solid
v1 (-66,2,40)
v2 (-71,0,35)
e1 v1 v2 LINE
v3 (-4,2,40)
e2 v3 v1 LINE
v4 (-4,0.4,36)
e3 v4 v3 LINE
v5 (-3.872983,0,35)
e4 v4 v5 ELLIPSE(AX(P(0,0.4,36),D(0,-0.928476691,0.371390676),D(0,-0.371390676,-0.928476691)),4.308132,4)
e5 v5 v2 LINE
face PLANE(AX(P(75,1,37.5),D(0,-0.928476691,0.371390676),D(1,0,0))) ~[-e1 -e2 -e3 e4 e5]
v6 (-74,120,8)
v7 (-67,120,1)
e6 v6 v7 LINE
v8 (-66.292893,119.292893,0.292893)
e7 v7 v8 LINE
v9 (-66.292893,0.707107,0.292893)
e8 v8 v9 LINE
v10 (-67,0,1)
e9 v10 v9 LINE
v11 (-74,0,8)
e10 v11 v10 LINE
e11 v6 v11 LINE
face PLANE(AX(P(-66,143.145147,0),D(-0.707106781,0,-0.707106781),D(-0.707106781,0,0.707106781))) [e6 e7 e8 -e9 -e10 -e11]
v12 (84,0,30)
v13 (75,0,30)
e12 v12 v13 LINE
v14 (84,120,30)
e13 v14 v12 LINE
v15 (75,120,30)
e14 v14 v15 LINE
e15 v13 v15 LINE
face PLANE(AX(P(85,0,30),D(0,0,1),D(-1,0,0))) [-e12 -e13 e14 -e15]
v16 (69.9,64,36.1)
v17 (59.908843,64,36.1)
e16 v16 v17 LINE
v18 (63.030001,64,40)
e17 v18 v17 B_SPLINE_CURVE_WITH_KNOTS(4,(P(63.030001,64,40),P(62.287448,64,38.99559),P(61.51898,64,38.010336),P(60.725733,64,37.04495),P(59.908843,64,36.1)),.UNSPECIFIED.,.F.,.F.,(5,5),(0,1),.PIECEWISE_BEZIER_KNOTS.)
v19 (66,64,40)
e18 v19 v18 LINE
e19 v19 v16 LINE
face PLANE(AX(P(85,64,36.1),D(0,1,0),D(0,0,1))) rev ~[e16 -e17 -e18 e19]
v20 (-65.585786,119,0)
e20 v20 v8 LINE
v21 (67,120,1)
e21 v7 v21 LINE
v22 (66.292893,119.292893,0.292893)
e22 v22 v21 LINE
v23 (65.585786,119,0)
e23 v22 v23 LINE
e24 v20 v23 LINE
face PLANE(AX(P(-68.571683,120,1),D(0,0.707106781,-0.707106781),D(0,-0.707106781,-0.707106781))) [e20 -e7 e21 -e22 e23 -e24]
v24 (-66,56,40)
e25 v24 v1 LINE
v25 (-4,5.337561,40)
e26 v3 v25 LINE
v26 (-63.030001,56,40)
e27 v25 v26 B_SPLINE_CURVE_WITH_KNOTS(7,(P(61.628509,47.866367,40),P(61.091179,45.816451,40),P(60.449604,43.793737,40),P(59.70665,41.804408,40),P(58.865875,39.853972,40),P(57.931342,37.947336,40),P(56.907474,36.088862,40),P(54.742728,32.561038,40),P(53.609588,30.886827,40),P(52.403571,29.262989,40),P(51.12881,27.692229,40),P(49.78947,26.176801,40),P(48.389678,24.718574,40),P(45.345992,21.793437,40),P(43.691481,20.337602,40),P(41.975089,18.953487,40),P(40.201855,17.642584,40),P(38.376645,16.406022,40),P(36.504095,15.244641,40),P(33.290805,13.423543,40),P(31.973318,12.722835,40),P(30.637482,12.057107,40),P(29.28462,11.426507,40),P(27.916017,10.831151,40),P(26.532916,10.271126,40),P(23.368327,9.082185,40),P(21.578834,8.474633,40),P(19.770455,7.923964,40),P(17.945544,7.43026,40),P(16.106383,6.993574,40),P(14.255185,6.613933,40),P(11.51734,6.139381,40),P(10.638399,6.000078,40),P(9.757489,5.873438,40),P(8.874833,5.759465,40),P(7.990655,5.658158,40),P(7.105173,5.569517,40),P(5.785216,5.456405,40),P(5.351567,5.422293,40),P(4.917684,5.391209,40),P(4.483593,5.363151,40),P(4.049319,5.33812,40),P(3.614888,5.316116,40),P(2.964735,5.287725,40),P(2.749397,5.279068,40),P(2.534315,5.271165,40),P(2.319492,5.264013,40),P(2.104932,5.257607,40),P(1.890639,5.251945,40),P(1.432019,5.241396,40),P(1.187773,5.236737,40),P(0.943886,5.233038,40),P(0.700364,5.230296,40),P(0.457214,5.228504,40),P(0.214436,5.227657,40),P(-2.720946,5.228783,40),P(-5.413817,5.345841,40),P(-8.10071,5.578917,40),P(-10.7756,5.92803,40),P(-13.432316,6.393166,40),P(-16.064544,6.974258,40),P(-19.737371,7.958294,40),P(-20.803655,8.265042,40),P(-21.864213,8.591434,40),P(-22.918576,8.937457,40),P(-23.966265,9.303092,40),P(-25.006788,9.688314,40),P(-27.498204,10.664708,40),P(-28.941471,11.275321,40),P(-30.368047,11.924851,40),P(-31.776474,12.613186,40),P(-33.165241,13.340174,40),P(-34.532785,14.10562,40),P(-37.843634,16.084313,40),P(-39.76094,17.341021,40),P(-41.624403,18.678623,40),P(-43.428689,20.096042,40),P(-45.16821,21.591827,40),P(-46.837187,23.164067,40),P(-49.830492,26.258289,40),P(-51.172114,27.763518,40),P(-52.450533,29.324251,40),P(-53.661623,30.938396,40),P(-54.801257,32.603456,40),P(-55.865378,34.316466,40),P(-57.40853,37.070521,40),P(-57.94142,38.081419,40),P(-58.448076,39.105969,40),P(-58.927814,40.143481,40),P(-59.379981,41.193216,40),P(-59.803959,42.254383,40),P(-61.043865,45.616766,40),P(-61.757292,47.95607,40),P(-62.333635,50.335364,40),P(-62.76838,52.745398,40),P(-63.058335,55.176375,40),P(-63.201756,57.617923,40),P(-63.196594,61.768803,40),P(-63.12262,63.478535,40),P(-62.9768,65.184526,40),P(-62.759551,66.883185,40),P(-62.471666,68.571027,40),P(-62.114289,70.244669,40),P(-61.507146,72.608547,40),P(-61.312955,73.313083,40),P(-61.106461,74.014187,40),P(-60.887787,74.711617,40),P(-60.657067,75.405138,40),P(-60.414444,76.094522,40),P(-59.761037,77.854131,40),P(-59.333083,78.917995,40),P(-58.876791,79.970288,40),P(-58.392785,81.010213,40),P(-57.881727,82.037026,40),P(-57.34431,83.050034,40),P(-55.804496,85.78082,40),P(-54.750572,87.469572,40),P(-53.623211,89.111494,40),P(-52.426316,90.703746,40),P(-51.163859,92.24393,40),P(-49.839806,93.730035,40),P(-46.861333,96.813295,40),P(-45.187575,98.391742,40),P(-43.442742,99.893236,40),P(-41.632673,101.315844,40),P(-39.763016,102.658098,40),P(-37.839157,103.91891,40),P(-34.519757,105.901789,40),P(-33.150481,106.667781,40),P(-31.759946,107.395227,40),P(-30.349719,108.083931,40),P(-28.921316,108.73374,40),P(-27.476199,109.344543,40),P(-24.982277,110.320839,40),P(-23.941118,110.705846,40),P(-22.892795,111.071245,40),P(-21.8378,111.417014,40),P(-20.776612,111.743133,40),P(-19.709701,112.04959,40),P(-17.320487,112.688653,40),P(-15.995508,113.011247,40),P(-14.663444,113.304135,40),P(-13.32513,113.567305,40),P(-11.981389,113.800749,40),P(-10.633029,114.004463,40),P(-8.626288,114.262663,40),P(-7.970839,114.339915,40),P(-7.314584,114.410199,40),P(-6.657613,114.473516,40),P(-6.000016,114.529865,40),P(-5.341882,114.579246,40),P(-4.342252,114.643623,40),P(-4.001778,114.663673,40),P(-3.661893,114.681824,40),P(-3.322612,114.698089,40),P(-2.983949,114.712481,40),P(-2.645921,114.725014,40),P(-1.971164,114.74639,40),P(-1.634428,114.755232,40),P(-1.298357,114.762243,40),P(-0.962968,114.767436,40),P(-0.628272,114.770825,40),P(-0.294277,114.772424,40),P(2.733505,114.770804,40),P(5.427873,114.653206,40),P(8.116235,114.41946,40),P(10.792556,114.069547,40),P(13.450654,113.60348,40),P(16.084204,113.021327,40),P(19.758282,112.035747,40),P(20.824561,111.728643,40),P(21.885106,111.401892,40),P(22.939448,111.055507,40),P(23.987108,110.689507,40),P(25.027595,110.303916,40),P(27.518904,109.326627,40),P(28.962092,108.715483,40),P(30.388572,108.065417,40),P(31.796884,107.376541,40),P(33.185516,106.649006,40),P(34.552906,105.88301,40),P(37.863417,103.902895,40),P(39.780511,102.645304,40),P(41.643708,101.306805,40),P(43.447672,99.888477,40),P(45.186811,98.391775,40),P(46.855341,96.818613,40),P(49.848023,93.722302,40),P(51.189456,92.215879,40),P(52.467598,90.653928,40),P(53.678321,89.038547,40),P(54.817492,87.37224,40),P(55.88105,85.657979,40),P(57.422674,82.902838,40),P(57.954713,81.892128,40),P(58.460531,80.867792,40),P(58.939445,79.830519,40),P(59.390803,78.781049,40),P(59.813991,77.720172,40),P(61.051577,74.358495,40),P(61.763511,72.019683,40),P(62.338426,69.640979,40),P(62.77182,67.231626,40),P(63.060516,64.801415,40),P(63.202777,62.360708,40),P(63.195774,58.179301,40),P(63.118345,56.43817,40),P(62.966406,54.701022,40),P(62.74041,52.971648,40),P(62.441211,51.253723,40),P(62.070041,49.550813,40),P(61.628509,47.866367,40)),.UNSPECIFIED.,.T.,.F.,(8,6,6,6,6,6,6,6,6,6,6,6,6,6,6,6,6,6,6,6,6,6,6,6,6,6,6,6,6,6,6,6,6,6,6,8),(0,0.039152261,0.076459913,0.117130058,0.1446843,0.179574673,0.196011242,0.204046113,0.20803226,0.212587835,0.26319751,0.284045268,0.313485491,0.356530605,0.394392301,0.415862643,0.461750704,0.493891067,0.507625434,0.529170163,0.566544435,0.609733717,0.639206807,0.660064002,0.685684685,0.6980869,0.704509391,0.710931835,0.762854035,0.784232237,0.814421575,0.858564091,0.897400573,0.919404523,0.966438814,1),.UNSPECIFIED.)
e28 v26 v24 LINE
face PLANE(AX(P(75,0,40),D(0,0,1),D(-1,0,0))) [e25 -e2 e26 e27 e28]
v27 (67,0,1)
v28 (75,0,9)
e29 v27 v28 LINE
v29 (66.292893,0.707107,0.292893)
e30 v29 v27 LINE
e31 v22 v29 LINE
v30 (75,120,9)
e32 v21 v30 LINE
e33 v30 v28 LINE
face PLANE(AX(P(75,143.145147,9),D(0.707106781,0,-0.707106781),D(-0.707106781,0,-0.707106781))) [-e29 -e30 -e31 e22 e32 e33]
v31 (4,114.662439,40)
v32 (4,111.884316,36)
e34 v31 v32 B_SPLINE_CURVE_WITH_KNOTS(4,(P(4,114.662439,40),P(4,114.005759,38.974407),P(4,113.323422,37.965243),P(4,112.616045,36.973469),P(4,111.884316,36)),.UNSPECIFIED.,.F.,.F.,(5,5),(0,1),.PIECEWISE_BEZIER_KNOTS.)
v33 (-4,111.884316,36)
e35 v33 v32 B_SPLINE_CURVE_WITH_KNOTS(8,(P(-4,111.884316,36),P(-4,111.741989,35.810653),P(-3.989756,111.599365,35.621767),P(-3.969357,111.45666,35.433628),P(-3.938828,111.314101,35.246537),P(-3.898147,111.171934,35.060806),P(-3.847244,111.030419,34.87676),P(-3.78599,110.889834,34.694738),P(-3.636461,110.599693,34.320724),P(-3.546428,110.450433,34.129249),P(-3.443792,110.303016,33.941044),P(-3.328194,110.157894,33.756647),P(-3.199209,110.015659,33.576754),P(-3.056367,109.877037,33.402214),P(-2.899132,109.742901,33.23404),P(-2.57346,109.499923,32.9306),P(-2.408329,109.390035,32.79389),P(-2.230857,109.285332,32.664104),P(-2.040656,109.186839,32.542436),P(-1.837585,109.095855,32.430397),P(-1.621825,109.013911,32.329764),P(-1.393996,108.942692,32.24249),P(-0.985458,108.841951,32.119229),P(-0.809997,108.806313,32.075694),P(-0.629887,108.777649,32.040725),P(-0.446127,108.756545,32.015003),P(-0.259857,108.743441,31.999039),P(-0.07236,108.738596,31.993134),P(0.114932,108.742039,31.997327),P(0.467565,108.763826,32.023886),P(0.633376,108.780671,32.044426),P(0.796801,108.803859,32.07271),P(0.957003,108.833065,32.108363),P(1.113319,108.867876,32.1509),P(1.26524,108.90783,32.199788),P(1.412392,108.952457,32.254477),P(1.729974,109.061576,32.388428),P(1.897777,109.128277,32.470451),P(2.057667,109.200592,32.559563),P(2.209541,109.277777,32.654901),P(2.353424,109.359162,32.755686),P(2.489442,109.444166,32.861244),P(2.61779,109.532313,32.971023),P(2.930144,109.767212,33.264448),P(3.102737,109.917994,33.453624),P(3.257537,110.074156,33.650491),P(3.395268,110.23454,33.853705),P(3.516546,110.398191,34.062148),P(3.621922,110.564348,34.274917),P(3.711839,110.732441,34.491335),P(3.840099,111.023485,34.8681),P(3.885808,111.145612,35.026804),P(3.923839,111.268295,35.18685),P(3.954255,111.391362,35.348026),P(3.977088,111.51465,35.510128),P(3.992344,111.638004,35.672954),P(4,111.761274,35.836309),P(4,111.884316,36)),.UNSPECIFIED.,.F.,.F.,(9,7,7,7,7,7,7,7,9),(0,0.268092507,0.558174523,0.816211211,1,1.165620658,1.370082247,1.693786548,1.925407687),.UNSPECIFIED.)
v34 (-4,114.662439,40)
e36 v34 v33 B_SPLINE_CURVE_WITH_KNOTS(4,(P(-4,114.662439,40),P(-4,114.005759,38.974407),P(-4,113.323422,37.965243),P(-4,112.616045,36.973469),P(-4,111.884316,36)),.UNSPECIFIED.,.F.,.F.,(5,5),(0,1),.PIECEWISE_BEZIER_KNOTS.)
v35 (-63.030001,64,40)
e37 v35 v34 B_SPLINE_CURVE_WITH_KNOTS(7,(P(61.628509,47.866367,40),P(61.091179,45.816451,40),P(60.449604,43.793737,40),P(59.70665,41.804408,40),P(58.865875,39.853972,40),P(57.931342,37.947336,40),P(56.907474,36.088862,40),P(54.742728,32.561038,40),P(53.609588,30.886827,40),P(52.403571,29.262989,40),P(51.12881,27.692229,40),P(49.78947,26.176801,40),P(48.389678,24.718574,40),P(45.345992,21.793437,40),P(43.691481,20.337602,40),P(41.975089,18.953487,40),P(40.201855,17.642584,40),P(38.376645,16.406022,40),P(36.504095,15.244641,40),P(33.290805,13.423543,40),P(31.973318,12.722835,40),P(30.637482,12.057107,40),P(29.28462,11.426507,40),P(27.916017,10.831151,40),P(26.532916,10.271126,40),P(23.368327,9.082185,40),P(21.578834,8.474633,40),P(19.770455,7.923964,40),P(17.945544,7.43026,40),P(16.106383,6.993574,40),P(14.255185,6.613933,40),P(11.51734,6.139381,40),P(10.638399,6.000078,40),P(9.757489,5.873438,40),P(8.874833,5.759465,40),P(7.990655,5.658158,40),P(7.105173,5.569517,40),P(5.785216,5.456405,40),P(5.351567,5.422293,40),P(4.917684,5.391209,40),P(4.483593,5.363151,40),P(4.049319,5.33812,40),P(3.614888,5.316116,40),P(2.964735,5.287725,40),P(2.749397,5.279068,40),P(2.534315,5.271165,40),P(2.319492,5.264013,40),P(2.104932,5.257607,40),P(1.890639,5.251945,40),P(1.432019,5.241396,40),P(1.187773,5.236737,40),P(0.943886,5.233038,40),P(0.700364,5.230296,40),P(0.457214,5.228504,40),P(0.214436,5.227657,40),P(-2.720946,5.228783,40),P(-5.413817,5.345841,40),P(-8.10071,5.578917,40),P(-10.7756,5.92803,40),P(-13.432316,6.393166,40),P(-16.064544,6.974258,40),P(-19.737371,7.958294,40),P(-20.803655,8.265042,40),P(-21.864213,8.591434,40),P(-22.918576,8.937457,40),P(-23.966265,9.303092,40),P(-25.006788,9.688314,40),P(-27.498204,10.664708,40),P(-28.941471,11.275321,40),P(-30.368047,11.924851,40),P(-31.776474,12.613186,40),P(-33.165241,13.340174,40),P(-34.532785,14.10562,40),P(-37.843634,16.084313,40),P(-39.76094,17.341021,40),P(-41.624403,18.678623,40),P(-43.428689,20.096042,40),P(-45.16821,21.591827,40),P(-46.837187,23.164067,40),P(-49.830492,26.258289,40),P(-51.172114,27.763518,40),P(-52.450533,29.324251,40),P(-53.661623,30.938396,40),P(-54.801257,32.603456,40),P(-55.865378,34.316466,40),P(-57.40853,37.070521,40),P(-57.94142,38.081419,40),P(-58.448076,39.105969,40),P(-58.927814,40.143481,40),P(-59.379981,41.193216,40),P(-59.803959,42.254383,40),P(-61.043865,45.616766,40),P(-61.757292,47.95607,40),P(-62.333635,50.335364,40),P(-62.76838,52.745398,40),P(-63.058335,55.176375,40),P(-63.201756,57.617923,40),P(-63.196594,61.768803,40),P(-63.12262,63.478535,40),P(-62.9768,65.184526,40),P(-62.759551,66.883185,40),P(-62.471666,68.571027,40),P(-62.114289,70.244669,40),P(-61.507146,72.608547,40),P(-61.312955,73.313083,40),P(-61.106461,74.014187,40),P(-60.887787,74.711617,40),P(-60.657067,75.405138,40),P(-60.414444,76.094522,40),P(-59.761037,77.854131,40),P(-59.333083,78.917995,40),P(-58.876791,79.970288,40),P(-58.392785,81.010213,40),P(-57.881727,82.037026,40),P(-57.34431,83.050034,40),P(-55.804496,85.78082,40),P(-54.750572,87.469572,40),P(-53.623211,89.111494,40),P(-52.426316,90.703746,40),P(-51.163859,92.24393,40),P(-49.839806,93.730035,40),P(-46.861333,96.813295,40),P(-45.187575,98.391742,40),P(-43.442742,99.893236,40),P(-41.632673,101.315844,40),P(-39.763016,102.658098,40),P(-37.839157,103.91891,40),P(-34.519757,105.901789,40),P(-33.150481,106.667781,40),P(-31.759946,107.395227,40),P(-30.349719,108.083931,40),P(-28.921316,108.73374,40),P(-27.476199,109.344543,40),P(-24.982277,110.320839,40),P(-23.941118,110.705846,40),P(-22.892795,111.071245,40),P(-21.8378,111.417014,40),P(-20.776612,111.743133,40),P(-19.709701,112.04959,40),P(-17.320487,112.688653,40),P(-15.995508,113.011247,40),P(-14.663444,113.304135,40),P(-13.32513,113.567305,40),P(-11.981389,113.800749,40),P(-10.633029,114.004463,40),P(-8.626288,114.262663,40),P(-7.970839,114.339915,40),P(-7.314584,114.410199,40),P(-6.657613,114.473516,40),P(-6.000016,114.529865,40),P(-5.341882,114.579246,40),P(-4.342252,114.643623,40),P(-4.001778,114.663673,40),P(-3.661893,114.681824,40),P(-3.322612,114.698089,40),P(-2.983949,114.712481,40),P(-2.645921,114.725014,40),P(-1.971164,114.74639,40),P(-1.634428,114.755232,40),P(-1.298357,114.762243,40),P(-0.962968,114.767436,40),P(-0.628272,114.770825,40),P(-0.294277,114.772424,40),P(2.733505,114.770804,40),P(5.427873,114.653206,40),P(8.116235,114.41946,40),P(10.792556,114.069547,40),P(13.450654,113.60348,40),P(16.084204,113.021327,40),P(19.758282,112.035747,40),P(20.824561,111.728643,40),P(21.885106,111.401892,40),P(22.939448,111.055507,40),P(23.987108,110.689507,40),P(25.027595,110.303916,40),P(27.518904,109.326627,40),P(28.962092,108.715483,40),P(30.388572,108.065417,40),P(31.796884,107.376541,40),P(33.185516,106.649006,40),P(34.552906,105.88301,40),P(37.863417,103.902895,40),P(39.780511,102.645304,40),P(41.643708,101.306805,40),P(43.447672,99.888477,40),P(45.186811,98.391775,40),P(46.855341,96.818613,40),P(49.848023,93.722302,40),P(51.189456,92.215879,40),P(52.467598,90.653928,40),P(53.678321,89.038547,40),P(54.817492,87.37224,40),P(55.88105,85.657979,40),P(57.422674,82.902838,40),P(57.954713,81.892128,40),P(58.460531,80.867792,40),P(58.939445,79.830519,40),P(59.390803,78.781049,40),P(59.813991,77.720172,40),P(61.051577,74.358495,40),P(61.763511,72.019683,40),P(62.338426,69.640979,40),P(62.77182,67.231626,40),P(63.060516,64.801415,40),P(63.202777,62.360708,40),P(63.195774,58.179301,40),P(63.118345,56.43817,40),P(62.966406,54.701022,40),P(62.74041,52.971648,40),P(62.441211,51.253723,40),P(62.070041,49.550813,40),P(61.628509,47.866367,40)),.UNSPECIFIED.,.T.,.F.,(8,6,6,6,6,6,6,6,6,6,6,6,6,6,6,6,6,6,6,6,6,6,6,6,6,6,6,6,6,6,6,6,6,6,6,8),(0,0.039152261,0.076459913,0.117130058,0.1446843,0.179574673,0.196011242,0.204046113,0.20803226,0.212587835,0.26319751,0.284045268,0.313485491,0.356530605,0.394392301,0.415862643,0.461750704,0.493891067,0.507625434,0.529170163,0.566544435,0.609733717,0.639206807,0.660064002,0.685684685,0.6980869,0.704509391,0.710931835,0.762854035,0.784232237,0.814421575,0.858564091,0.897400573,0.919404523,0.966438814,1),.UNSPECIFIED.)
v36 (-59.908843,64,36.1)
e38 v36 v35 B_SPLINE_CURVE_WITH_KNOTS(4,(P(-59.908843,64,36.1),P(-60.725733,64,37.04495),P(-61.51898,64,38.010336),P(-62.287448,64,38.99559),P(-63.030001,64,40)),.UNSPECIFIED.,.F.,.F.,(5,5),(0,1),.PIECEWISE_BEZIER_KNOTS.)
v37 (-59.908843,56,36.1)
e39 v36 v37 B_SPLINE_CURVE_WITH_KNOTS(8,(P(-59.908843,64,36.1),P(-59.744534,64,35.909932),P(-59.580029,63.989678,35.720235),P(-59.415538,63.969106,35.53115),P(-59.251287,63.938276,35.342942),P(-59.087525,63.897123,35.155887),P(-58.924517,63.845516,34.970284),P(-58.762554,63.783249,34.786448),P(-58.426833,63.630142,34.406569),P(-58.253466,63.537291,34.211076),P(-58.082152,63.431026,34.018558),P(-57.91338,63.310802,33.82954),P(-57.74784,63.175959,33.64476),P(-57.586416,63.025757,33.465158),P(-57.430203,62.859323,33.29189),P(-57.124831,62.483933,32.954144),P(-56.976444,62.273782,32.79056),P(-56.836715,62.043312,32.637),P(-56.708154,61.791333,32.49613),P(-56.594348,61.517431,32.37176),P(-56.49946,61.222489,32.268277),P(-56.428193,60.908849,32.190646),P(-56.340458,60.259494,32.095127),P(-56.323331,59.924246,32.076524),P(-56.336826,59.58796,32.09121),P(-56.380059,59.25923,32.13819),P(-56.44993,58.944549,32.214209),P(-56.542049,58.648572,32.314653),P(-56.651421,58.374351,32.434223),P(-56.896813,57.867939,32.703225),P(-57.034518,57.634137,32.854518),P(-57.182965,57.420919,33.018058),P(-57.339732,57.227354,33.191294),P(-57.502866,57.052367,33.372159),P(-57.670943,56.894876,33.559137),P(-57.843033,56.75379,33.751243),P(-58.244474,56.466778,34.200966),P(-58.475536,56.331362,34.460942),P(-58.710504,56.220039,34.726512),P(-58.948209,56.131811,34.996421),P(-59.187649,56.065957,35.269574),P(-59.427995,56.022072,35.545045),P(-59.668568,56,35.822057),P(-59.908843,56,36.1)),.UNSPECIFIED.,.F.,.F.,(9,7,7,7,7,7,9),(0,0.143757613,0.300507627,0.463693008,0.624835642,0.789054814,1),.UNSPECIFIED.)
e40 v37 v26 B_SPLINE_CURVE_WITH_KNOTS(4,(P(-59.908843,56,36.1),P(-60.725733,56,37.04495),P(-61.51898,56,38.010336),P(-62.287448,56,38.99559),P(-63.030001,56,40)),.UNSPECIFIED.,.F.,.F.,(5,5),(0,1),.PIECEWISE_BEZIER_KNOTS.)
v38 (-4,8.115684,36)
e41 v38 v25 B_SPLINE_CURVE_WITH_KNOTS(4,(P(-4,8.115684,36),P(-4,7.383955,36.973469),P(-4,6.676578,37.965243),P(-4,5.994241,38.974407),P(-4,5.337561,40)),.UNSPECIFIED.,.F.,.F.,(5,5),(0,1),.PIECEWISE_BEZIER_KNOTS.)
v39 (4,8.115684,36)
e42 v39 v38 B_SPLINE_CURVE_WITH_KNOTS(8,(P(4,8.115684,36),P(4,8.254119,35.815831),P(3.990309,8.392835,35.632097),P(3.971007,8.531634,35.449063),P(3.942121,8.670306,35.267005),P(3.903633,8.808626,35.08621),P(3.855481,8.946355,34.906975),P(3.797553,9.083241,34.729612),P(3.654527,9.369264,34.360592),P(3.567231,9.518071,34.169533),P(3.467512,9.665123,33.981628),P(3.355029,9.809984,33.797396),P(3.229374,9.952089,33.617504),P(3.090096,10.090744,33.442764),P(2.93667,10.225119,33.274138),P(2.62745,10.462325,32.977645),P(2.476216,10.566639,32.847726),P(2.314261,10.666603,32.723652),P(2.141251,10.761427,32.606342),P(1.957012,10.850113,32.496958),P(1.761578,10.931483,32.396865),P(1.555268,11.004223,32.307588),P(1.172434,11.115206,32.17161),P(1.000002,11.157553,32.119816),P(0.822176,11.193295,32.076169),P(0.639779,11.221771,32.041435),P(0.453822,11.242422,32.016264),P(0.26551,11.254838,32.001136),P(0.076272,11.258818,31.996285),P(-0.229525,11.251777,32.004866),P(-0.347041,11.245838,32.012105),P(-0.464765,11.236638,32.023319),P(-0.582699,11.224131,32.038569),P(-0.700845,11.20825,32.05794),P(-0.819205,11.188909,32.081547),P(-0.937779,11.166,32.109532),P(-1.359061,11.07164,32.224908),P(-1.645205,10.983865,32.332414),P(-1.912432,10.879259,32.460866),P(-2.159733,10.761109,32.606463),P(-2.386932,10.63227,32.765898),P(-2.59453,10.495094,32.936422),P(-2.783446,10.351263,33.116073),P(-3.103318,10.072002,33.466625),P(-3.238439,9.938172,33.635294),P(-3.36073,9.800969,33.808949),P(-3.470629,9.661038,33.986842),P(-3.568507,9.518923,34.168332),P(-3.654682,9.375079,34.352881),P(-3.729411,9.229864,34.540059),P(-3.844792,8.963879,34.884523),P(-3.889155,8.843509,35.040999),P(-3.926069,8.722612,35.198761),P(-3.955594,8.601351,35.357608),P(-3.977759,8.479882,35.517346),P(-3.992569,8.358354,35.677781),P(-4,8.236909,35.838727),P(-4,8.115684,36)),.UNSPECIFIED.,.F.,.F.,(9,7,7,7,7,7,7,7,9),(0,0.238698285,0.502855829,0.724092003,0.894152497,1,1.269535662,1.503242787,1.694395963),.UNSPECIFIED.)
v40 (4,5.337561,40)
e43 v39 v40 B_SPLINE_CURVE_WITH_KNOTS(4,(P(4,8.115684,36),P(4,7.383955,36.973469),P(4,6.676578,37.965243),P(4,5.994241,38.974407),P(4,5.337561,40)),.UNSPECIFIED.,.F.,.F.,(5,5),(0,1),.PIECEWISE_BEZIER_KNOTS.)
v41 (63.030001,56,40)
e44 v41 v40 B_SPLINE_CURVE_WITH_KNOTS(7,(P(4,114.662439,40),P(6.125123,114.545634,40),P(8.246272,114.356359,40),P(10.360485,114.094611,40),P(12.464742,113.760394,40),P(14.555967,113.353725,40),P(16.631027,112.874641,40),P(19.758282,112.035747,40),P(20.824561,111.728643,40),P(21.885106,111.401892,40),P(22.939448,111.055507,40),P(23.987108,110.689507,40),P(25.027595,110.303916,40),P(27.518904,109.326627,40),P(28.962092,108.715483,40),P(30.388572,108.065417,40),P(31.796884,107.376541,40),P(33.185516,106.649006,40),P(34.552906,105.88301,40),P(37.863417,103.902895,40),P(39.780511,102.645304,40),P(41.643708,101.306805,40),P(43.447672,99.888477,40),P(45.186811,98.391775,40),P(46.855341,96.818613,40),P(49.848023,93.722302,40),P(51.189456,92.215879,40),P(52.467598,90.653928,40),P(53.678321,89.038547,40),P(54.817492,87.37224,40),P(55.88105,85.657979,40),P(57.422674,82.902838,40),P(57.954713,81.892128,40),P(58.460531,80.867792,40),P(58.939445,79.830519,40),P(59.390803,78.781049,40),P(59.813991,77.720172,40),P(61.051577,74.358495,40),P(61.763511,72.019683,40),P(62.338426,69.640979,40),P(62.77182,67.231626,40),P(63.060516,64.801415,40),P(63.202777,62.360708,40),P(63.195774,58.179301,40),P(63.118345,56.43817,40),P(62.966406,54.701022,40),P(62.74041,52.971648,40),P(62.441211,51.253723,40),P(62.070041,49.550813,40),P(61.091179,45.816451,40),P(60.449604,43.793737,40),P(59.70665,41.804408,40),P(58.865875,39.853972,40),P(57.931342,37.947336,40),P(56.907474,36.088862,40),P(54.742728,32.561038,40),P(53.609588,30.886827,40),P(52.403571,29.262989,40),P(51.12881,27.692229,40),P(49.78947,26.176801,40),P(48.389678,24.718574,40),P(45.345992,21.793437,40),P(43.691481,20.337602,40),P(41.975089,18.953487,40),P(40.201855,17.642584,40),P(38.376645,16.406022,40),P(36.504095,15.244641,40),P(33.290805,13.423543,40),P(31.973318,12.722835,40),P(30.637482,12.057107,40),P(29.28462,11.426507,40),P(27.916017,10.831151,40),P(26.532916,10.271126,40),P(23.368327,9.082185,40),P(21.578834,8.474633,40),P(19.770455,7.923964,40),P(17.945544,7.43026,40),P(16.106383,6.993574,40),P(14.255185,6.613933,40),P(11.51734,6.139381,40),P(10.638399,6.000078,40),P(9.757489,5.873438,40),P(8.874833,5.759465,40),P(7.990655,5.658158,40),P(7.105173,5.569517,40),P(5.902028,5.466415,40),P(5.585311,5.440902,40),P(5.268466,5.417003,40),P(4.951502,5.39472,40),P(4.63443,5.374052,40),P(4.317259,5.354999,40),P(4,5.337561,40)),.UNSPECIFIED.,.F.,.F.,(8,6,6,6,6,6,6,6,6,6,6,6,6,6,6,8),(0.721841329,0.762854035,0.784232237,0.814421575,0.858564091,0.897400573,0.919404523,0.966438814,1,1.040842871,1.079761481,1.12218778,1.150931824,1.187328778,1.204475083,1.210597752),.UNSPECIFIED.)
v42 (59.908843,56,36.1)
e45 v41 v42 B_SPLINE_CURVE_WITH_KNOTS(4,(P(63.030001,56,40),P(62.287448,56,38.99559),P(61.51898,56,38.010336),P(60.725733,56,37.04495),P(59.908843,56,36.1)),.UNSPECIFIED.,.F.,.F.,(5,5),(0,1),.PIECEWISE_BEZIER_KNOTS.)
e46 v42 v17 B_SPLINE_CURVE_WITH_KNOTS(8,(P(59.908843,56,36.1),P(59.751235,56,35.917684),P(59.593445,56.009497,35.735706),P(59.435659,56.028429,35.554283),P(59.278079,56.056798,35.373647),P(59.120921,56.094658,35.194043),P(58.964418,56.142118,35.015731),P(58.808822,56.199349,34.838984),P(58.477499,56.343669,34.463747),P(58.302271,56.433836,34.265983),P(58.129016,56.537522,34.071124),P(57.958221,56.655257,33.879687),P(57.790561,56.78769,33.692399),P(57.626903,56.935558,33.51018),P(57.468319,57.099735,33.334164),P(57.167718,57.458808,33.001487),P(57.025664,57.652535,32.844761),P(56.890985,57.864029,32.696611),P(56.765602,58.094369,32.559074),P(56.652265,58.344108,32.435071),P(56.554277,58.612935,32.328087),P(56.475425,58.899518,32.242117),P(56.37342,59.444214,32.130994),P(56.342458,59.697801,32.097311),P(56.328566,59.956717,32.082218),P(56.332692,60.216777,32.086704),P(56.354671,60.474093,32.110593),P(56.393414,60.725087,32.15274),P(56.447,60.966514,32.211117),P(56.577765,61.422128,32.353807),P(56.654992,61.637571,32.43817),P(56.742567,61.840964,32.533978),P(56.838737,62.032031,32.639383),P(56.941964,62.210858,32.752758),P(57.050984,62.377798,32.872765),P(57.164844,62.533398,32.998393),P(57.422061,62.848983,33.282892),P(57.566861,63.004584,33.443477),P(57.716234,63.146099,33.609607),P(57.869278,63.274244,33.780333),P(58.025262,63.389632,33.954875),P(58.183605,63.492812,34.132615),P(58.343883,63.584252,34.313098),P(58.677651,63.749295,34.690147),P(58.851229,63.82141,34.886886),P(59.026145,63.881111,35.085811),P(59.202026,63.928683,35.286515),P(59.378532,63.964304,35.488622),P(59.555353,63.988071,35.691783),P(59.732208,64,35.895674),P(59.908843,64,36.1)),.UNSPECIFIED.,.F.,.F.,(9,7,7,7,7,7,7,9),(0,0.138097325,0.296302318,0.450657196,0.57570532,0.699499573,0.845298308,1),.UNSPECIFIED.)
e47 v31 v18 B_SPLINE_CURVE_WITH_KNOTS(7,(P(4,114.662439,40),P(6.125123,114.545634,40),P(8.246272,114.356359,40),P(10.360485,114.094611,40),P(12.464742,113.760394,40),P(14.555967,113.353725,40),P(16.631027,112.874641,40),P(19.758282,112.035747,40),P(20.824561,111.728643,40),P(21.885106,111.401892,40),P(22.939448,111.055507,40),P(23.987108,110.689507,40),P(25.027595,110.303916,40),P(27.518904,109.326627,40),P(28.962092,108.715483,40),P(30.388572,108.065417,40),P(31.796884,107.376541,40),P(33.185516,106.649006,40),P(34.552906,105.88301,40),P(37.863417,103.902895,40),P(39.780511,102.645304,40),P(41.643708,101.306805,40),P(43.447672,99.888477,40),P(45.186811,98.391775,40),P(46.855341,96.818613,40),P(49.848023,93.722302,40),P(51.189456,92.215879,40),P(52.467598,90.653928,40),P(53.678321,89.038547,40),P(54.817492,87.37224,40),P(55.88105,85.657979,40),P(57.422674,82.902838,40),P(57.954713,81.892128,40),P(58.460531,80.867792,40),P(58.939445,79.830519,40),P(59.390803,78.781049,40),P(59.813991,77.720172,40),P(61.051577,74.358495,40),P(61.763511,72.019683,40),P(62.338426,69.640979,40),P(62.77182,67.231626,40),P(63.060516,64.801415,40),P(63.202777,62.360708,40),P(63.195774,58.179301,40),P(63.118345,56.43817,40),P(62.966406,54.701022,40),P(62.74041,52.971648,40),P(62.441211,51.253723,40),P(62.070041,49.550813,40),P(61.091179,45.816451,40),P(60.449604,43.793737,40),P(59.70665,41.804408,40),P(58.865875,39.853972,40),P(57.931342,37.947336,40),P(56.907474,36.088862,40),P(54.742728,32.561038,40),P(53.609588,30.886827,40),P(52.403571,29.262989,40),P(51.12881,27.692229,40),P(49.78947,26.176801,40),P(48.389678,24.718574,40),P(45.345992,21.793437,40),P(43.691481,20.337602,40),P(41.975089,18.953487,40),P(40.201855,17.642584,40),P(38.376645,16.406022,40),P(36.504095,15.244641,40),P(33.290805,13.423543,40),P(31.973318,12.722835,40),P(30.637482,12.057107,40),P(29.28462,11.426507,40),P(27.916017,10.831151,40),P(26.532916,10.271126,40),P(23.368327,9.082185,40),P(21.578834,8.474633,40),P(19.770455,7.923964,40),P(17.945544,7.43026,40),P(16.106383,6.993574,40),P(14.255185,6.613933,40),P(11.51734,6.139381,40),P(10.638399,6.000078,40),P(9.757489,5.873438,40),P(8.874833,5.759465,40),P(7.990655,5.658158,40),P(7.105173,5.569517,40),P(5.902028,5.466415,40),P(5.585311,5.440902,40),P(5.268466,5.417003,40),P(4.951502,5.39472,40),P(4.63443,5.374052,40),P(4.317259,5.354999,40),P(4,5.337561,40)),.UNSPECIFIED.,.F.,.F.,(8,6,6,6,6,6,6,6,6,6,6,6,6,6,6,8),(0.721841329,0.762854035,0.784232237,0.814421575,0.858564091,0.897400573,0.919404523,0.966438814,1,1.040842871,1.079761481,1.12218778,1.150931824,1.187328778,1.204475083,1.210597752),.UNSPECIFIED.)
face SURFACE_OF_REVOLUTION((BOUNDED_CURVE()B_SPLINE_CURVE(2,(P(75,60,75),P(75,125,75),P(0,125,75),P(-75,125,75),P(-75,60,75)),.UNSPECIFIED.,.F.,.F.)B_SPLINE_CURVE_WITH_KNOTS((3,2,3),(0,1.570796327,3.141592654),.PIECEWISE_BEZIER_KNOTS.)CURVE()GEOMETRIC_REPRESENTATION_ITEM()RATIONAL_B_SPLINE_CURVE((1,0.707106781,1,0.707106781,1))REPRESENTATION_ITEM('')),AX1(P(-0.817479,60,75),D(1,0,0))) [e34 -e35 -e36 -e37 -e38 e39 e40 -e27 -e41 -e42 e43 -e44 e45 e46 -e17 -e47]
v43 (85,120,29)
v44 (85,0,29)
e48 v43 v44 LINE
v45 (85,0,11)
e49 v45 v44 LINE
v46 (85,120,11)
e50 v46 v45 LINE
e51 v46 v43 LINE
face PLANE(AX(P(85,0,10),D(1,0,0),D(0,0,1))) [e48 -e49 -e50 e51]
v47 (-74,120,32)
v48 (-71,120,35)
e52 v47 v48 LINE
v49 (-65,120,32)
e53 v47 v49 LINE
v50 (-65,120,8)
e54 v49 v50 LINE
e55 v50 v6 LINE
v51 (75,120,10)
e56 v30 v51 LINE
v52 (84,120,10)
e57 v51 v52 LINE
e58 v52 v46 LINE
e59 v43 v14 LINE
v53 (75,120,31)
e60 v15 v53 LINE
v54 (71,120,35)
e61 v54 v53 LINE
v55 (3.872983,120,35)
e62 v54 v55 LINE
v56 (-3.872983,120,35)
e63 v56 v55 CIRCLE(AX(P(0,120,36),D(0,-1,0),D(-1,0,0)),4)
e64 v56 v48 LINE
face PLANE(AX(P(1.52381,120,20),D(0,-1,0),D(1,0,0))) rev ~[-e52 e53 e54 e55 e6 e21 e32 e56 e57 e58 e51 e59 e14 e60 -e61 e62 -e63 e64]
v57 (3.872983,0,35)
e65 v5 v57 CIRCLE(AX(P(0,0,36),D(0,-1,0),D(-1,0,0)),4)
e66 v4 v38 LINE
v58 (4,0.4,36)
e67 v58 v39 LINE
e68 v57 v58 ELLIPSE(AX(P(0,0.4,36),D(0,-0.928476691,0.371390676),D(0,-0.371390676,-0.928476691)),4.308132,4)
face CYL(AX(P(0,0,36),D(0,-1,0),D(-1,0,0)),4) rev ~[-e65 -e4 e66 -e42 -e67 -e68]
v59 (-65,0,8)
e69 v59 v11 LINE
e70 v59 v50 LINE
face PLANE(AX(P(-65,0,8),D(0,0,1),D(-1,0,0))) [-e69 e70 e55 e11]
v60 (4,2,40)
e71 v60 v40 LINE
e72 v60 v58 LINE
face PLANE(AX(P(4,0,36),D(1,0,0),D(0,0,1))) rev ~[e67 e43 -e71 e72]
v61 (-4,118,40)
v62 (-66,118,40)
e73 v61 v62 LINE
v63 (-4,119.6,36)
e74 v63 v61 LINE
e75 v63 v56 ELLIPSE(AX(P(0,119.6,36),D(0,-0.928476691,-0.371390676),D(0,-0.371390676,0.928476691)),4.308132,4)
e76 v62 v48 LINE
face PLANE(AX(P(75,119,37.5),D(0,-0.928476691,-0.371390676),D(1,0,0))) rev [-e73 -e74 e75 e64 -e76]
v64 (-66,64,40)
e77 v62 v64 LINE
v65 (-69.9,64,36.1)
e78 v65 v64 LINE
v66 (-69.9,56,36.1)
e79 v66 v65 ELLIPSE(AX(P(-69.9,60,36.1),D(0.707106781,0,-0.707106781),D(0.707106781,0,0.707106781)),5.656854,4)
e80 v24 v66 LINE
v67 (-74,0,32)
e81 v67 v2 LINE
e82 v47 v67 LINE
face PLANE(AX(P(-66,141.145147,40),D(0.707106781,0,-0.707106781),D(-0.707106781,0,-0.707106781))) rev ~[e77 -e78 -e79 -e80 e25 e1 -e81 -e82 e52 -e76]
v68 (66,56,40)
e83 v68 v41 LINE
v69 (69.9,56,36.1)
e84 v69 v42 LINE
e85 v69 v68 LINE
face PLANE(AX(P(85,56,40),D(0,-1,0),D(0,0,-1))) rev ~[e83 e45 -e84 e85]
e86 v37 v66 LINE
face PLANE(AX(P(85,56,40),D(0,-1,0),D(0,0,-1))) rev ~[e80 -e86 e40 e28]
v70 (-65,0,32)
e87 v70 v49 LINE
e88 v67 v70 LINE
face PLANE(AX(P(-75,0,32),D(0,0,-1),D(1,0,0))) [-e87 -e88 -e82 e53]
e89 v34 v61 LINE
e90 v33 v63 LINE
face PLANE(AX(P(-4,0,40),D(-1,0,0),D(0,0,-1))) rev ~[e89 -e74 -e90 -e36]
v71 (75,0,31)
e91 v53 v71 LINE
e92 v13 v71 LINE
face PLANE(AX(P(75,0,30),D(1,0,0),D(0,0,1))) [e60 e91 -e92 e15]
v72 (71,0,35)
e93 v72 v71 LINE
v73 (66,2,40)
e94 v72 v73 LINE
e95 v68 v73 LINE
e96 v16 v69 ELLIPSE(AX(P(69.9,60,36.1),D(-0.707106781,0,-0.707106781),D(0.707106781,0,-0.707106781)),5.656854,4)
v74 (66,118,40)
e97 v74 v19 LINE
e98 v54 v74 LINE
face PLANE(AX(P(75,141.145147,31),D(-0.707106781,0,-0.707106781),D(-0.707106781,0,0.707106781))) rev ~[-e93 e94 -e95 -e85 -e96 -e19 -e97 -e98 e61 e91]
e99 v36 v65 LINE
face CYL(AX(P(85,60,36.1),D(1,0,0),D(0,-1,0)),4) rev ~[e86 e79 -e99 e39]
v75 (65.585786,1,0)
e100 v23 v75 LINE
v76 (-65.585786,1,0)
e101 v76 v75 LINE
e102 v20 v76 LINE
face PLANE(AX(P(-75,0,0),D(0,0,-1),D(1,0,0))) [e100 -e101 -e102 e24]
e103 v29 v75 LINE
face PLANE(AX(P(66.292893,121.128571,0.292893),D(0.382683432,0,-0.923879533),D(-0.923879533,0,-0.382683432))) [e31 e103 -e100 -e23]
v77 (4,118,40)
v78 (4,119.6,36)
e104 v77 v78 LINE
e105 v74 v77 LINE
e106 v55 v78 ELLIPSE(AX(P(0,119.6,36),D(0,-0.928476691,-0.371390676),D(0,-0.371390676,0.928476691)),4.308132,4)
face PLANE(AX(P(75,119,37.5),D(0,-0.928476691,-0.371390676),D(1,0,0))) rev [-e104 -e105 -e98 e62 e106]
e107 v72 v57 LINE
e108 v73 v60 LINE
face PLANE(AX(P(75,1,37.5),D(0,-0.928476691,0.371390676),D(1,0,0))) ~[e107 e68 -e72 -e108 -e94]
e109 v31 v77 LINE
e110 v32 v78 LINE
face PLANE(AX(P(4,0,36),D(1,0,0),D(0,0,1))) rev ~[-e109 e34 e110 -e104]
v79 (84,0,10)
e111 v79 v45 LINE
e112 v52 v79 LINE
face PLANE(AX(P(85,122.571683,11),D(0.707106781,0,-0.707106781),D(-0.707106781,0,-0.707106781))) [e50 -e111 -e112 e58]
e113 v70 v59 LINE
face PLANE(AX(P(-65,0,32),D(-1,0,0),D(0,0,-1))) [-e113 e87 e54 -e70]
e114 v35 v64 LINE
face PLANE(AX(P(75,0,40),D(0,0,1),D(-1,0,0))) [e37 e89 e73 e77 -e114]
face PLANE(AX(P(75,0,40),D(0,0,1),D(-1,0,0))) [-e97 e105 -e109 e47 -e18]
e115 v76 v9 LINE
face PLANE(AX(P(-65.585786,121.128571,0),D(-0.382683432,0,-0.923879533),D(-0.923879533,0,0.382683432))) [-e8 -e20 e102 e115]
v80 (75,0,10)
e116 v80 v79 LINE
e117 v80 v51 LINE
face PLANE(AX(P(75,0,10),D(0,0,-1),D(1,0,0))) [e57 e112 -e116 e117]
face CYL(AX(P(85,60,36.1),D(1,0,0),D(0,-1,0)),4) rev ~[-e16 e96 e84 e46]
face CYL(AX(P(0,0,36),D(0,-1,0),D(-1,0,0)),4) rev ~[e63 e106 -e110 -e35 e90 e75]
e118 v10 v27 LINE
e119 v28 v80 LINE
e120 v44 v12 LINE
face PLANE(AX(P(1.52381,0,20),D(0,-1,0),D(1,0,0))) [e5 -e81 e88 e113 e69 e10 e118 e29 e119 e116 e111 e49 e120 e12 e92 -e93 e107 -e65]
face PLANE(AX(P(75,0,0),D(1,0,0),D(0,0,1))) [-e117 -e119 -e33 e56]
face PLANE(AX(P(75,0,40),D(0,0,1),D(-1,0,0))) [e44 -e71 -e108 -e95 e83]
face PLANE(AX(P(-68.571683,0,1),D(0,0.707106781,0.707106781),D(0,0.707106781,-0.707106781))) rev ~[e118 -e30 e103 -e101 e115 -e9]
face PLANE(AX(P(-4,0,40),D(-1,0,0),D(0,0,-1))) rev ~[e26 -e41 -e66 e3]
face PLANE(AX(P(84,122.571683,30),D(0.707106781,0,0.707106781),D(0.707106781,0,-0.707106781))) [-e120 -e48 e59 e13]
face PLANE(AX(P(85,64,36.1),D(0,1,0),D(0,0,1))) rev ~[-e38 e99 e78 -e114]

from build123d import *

# Parameters (mm, degrees)
F1_DEPTH    = 120
F2_SIZE2    = 2
F2_SIZE     = 5
F2_2_SIZE2  = 2
F2_2_SIZE   = 5
F3_T1_DEPTH = 162.2902937834
F3_T3_DEPTH = 166.2902937834
F4_T1_DEPTH = 125.1433659759
F4_T3_DEPTH = 137.1433659759
F4_T5_DEPTH = 122.2571417204
F10_DEPTH   = 120.001
F12_DEPTH   = 159.001


# Not quite as in the source:
# - a fillet or chamfer that OpenCascade refuses, or shapes differently, is made with other operations: its cross-section is extruded or revolved along the edge and cut away or added


with BuildPart() as f1:
    # F0 (on Front) → F1 (new body)
    with BuildSketch(Plane.XZ):
        Polygon((-75, 8), (-75, 0), (75, 0), (75, 10), (85, 10), (85, 30), (75, 30), (75, 40), (-75, 40), (-75, 32), (-65, 32), (-65, 8), align=None)
    extrude(amount=-F1_DEPTH)

    # F2
    f2_edges = [f1.edges().sort_by_distance(p)[0] for p in [
        (0, 0, 40),
    ]]
    f2_side = f1.faces().sort_by_distance((5.503356, 0, 20))[0]
    chamfer(f2_edges, length=F2_SIZE, length2=F2_SIZE2, reference=f2_side)

    # F2#2
    f2_2_edges = [f1.edges().sort_by_distance(p)[0] for p in [
        (0, 120, 40),
    ]]
    f2_2_side = f1.faces().sort_by_distance((5.503356, 120, 20))[0]
    chamfer(f2_2_edges, length=F2_2_SIZE, length2=F2_2_SIZE2, reference=f2_2_side)

    # F3: chamfer of 9 on 4 edges, made by hand

    # F3_s2 → F3_t1 (cut)
    with BuildSketch(Plane.XZ.offset(-141.1451468917)):
        Polygon((75, 31), (66, 40), (75, 40), align=None)
        Polygon((-66, 40), (-75, 31), (-75, 40), align=None)
    extrude(amount=F3_T1_DEPTH, mode=Mode.SUBTRACT)

    # F3_s4 → F3_t3 (cut)
    with BuildSketch(Plane.XZ.offset(-143.1451468917)):
        Polygon((-66, 0), (-75, 9), (-75, 0), align=None)
        Polygon((75, 9), (66, 0), (75, 0), align=None)
    extrude(amount=F3_T3_DEPTH, mode=Mode.SUBTRACT)

    # F4: chamfer of 1 on 6 edges, made by hand

    # F4_s2 → F4_t1 (cut)
    with BuildSketch(Plane.XZ.offset(-122.571682988)):
        Polygon((84, 30), (85, 29), (85, 30), align=None)
        Polygon((85, 11), (84, 10), (85, 10), align=None)
    extrude(amount=F4_T1_DEPTH, mode=Mode.SUBTRACT)

    # F4_s4 → F4_t3 (cut)
    with BuildSketch(Plane.YZ.offset(-68.571682988)):
        Polygon((0, 1), (1, 0), (0, 0), align=None)
        Polygon((120, 1), (119, 0), (120, 0), align=None)
    extrude(amount=F4_T3_DEPTH, mode=Mode.SUBTRACT)

    # F4_s6 → F4_t5 (cut)
    with BuildSketch(Plane.XZ.offset(-121.1285708602)):
        Polygon((-65.5857864376, 0), (-66.2928932188, 0.2928932188), (-66, 0), align=None)
        Polygon((66.2928932188, 0.2928932188), (65.5857864376, 0), (66, 0), align=None)
    extrude(amount=F4_T5_DEPTH, mode=Mode.SUBTRACT)

    # F6 (on offset) → F8 (revolve, cut)
    with BuildSketch(Plane.XY.offset(75)):
        with BuildLine():
            Line((-75, 60), (75, 60))
            add(Edge.make_bspline(
                [(75, 60), (75, 125), (0, 125), (-75, 125), (-75, 60)],
                knots=[0, 0, 0, 1.5707963268, 1.5707963268, 3.1415926536, 3.1415926536, 3.1415926536], degree=2, weights=[1, 0.7071067812, 1, 0.7071067812, 1]))
        make_face()
    revolve(axis=Axis((-0.8174791932, 60, 75), (1, 0, 0)), mode=Mode.SUBTRACT)

    # F9 (on face) → F10 (cut, through all)
    with BuildSketch(Plane.XZ):
        with BuildLine():
            Line((4, 36), (4, 40))
            Line((4, 40), (-4, 40))
            Line((-4, 40), (-4, 36))
            ThreePointArc((-4, 36), (0, 32), (4, 36))
        make_face()
    extrude(amount=-F10_DEPTH, mode=Mode.SUBTRACT)

    # F11 (on face) → F12 (cut, through all)
    with BuildSketch(Plane.YZ.offset(85)):
        with BuildLine():
            Line((64, 36.1), (64, 40))
            Line((64, 40), (56, 40))
            Line((56, 40), (56, 36.1))
            ThreePointArc((56, 36.1), (60, 32.1), (64, 36.1))
        make_face()
    extrude(amount=-F12_DEPTH, mode=Mode.SUBTRACT)


solid = f1.part
